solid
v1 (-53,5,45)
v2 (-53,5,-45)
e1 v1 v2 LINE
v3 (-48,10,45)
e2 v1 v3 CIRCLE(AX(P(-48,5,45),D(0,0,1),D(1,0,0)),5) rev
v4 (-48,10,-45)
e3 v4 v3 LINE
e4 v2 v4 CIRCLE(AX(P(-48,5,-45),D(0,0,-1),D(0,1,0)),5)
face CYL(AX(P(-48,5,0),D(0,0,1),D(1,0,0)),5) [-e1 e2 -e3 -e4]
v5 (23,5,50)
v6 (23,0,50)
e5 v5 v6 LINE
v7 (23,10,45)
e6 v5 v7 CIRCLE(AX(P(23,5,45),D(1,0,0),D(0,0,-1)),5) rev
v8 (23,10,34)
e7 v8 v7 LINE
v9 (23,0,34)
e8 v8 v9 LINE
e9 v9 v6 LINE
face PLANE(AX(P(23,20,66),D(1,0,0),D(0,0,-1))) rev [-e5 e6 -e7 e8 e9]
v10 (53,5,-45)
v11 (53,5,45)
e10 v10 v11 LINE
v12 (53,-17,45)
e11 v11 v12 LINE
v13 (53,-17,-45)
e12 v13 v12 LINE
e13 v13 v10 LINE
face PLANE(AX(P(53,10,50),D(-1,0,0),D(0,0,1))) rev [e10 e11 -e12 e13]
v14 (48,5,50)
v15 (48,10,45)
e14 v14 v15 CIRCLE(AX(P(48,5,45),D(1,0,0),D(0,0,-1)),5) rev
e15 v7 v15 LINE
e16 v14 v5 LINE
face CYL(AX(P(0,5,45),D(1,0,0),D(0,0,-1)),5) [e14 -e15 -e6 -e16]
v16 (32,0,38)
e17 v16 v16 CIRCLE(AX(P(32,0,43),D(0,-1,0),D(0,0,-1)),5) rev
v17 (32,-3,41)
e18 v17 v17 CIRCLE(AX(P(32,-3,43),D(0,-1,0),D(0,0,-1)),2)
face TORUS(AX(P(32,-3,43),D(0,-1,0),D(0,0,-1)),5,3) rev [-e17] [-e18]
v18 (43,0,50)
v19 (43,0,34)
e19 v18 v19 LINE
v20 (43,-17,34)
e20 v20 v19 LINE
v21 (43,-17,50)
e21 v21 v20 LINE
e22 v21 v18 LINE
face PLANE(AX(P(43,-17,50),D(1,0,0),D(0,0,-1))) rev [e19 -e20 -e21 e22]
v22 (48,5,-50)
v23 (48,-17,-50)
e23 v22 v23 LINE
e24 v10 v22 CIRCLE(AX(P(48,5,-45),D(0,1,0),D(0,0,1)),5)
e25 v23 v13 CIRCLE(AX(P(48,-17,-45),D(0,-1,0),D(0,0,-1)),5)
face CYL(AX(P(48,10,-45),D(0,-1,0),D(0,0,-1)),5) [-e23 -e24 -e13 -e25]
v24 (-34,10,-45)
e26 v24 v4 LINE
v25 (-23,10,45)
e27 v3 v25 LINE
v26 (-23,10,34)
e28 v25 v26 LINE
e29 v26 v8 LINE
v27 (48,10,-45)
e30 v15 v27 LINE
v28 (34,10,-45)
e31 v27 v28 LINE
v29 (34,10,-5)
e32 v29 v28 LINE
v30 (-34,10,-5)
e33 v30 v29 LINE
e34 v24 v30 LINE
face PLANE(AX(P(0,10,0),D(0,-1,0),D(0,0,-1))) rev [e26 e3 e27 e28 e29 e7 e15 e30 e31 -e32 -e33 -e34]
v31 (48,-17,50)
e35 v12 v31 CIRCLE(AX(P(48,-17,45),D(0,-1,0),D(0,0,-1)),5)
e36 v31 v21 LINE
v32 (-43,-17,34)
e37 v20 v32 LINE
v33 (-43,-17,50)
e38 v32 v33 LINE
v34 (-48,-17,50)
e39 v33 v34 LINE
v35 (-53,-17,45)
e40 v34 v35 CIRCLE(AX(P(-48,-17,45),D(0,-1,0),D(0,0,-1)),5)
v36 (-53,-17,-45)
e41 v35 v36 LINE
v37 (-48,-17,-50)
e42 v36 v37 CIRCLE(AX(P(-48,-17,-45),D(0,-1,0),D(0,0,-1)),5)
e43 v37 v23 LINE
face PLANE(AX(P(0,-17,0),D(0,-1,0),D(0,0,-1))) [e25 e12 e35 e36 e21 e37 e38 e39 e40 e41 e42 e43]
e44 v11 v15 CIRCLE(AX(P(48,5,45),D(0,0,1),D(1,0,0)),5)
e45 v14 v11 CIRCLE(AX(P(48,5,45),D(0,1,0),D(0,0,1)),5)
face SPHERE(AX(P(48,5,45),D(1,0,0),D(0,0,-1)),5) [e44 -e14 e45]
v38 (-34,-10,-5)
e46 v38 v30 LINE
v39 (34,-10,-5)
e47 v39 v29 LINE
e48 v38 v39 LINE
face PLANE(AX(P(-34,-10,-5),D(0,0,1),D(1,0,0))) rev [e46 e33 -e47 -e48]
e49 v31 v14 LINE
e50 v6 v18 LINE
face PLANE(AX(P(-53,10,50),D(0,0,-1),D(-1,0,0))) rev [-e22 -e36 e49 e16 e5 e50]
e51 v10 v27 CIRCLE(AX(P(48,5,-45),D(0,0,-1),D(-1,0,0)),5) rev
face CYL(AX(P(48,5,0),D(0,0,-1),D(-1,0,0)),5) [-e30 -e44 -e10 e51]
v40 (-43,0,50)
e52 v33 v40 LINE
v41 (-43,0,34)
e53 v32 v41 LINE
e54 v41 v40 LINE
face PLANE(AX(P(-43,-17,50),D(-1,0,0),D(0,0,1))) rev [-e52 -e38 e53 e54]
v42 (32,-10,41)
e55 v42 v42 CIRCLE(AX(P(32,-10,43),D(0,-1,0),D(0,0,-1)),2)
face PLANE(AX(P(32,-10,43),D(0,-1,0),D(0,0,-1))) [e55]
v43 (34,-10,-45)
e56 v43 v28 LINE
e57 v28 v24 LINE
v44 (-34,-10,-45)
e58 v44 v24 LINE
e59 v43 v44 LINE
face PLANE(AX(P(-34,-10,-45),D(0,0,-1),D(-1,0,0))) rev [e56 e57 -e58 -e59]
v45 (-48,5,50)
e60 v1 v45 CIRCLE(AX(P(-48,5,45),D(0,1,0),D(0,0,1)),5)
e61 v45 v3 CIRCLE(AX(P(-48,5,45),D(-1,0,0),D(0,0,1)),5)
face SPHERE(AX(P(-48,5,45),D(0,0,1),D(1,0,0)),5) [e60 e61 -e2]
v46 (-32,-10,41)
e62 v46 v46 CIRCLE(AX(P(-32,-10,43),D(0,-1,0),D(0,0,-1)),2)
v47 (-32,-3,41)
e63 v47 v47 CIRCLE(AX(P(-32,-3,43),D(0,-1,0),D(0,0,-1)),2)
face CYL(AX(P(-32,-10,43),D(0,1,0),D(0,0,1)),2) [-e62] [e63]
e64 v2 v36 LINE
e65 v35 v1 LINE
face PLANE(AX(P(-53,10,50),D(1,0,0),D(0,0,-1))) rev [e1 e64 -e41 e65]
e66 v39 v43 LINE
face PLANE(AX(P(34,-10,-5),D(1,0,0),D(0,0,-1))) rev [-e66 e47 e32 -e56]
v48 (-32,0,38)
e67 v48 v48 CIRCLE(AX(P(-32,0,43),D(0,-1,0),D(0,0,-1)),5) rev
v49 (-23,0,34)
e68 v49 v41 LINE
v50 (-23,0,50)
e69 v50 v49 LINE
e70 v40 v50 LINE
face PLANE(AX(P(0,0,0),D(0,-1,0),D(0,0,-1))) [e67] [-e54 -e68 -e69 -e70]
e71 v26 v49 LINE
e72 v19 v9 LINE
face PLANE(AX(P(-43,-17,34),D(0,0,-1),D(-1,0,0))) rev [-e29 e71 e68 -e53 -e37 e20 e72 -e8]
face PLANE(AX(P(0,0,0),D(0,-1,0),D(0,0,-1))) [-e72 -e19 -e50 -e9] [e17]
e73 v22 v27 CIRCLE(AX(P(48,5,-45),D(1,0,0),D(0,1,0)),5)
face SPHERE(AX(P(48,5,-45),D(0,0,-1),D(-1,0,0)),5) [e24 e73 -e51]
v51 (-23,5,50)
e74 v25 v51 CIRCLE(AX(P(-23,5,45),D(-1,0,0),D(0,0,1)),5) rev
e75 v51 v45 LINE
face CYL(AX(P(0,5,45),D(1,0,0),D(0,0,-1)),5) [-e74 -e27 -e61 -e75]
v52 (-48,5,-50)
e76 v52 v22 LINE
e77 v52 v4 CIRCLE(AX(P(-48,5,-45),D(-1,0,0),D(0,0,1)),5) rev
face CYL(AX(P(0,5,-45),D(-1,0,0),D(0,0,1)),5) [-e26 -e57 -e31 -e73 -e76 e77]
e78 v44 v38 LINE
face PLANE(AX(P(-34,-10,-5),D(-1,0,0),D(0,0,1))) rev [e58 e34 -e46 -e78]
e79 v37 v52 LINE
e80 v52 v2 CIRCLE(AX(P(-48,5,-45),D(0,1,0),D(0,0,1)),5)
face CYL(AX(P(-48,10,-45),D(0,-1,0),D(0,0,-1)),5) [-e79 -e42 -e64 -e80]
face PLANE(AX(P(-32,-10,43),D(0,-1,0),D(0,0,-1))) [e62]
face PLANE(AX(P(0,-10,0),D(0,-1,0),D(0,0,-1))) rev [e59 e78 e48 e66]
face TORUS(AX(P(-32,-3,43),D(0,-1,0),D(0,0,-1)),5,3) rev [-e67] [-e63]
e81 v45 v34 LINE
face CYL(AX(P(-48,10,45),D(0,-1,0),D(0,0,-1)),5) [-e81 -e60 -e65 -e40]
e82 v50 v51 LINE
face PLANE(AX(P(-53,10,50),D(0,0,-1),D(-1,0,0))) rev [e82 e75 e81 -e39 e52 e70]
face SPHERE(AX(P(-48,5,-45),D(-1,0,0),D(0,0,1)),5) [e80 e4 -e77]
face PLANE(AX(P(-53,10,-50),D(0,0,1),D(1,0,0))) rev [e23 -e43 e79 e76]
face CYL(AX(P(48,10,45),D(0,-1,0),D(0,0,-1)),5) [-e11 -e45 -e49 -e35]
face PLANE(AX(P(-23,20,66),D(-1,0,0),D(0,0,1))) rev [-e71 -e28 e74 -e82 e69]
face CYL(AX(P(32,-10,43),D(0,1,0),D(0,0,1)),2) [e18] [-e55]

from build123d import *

# Parameters (mm, degrees)
SKETCH_2_W          = 106
SKETCH_2_H          = 100
EXTRUDE_1_DEPTH     = 10
SKETCH_3_R          = 2
EXTRUDE_2_DEPTH     = 10
EXTRUDE_3_DEPTH     = 17
SKETCH_5_W          = 68
SKETCH_5_H          = 40
CUT_EXTRUDE_1_DEPTH = 20
SKETCH_6_W          = 46
SKETCH_6_H          = 32
CUT_EXTRUDE_2_DEPTH = 20
FILLET_1_R          = 3
FILLET_2_R          = 5


with BuildPart() as part:
    # 草图2 → 凸台-拉伸1 (new body)
    with BuildSketch(Plane(origin=(0, 0, 0), x_dir=(1, 0, 0), z_dir=(0, 1, 0))):
        Rectangle(SKETCH_2_W, SKETCH_2_H)
    extrude(amount=EXTRUDE_1_DEPTH)

    # 草图3 → 凸台-拉伸2 (add)
    with BuildSketch(Plane.XZ):
        with Locations(Location((-32, 43, 0), (0, 0, 270))):
            Circle(SKETCH_3_R)
        with Locations(Location((32, 43, 0), (0, 0, 270))):
            Circle(SKETCH_3_R)
    extrude(amount=EXTRUDE_2_DEPTH)

    # 草图4 → 凸台-拉伸3 (add)
    with BuildSketch(Plane.XZ):
        Polygon((-53, 50), (-43, 50), (-43, 34), (43, 34), (43, 50), (53, 50), (53, -50), (43, -50), (-43, -50), (-53, -50), align=None)
    extrude(amount=EXTRUDE_3_DEPTH)

    # 草图5 → 切除-拉伸1 (cut)
    with BuildSketch(Plane(origin=(0, 10, 0), x_dir=(1, 0, 0), z_dir=(0, 1, 0))):
        with Locations((0, 25)):
            Rectangle(SKETCH_5_W, SKETCH_5_H)
    extrude(amount=-CUT_EXTRUDE_1_DEPTH, mode=Mode.SUBTRACT)

    # 草图6 → 切除-拉伸2 (cut)
    with BuildSketch(Plane.XZ):
        with Locations((0, 50)):
            Rectangle(SKETCH_6_W, SKETCH_6_H)
    extrude(amount=-CUT_EXTRUDE_2_DEPTH, mode=Mode.SUBTRACT)

    # 圆角1
    fillet_1_edges = [part.edges().sort_by_distance(p)[0] for p in [
        (-32, 0, 45),
        (32, 0, 45),
    ]]
    fillet(fillet_1_edges, radius=FILLET_1_R)

    # 圆角2
    fillet_2_edges = [part.edges().sort_by_distance(p)[0] for p in [
        (-53, 10, 0),
        (-38, 10, 50),
        (53, 10, 0),
        (38, 10, 50),
        (53, -3.5, 50),
        (-53, -3.5, 50),
        (-53, -3.5, -50),
        (53, -3.5, -50),
        (0, 10, -50),
    ]]
    fillet(fillet_2_edges, radius=FILLET_2_R - 0.0001)  # a hair under: the kernel refuses the full size


solid = part.part
